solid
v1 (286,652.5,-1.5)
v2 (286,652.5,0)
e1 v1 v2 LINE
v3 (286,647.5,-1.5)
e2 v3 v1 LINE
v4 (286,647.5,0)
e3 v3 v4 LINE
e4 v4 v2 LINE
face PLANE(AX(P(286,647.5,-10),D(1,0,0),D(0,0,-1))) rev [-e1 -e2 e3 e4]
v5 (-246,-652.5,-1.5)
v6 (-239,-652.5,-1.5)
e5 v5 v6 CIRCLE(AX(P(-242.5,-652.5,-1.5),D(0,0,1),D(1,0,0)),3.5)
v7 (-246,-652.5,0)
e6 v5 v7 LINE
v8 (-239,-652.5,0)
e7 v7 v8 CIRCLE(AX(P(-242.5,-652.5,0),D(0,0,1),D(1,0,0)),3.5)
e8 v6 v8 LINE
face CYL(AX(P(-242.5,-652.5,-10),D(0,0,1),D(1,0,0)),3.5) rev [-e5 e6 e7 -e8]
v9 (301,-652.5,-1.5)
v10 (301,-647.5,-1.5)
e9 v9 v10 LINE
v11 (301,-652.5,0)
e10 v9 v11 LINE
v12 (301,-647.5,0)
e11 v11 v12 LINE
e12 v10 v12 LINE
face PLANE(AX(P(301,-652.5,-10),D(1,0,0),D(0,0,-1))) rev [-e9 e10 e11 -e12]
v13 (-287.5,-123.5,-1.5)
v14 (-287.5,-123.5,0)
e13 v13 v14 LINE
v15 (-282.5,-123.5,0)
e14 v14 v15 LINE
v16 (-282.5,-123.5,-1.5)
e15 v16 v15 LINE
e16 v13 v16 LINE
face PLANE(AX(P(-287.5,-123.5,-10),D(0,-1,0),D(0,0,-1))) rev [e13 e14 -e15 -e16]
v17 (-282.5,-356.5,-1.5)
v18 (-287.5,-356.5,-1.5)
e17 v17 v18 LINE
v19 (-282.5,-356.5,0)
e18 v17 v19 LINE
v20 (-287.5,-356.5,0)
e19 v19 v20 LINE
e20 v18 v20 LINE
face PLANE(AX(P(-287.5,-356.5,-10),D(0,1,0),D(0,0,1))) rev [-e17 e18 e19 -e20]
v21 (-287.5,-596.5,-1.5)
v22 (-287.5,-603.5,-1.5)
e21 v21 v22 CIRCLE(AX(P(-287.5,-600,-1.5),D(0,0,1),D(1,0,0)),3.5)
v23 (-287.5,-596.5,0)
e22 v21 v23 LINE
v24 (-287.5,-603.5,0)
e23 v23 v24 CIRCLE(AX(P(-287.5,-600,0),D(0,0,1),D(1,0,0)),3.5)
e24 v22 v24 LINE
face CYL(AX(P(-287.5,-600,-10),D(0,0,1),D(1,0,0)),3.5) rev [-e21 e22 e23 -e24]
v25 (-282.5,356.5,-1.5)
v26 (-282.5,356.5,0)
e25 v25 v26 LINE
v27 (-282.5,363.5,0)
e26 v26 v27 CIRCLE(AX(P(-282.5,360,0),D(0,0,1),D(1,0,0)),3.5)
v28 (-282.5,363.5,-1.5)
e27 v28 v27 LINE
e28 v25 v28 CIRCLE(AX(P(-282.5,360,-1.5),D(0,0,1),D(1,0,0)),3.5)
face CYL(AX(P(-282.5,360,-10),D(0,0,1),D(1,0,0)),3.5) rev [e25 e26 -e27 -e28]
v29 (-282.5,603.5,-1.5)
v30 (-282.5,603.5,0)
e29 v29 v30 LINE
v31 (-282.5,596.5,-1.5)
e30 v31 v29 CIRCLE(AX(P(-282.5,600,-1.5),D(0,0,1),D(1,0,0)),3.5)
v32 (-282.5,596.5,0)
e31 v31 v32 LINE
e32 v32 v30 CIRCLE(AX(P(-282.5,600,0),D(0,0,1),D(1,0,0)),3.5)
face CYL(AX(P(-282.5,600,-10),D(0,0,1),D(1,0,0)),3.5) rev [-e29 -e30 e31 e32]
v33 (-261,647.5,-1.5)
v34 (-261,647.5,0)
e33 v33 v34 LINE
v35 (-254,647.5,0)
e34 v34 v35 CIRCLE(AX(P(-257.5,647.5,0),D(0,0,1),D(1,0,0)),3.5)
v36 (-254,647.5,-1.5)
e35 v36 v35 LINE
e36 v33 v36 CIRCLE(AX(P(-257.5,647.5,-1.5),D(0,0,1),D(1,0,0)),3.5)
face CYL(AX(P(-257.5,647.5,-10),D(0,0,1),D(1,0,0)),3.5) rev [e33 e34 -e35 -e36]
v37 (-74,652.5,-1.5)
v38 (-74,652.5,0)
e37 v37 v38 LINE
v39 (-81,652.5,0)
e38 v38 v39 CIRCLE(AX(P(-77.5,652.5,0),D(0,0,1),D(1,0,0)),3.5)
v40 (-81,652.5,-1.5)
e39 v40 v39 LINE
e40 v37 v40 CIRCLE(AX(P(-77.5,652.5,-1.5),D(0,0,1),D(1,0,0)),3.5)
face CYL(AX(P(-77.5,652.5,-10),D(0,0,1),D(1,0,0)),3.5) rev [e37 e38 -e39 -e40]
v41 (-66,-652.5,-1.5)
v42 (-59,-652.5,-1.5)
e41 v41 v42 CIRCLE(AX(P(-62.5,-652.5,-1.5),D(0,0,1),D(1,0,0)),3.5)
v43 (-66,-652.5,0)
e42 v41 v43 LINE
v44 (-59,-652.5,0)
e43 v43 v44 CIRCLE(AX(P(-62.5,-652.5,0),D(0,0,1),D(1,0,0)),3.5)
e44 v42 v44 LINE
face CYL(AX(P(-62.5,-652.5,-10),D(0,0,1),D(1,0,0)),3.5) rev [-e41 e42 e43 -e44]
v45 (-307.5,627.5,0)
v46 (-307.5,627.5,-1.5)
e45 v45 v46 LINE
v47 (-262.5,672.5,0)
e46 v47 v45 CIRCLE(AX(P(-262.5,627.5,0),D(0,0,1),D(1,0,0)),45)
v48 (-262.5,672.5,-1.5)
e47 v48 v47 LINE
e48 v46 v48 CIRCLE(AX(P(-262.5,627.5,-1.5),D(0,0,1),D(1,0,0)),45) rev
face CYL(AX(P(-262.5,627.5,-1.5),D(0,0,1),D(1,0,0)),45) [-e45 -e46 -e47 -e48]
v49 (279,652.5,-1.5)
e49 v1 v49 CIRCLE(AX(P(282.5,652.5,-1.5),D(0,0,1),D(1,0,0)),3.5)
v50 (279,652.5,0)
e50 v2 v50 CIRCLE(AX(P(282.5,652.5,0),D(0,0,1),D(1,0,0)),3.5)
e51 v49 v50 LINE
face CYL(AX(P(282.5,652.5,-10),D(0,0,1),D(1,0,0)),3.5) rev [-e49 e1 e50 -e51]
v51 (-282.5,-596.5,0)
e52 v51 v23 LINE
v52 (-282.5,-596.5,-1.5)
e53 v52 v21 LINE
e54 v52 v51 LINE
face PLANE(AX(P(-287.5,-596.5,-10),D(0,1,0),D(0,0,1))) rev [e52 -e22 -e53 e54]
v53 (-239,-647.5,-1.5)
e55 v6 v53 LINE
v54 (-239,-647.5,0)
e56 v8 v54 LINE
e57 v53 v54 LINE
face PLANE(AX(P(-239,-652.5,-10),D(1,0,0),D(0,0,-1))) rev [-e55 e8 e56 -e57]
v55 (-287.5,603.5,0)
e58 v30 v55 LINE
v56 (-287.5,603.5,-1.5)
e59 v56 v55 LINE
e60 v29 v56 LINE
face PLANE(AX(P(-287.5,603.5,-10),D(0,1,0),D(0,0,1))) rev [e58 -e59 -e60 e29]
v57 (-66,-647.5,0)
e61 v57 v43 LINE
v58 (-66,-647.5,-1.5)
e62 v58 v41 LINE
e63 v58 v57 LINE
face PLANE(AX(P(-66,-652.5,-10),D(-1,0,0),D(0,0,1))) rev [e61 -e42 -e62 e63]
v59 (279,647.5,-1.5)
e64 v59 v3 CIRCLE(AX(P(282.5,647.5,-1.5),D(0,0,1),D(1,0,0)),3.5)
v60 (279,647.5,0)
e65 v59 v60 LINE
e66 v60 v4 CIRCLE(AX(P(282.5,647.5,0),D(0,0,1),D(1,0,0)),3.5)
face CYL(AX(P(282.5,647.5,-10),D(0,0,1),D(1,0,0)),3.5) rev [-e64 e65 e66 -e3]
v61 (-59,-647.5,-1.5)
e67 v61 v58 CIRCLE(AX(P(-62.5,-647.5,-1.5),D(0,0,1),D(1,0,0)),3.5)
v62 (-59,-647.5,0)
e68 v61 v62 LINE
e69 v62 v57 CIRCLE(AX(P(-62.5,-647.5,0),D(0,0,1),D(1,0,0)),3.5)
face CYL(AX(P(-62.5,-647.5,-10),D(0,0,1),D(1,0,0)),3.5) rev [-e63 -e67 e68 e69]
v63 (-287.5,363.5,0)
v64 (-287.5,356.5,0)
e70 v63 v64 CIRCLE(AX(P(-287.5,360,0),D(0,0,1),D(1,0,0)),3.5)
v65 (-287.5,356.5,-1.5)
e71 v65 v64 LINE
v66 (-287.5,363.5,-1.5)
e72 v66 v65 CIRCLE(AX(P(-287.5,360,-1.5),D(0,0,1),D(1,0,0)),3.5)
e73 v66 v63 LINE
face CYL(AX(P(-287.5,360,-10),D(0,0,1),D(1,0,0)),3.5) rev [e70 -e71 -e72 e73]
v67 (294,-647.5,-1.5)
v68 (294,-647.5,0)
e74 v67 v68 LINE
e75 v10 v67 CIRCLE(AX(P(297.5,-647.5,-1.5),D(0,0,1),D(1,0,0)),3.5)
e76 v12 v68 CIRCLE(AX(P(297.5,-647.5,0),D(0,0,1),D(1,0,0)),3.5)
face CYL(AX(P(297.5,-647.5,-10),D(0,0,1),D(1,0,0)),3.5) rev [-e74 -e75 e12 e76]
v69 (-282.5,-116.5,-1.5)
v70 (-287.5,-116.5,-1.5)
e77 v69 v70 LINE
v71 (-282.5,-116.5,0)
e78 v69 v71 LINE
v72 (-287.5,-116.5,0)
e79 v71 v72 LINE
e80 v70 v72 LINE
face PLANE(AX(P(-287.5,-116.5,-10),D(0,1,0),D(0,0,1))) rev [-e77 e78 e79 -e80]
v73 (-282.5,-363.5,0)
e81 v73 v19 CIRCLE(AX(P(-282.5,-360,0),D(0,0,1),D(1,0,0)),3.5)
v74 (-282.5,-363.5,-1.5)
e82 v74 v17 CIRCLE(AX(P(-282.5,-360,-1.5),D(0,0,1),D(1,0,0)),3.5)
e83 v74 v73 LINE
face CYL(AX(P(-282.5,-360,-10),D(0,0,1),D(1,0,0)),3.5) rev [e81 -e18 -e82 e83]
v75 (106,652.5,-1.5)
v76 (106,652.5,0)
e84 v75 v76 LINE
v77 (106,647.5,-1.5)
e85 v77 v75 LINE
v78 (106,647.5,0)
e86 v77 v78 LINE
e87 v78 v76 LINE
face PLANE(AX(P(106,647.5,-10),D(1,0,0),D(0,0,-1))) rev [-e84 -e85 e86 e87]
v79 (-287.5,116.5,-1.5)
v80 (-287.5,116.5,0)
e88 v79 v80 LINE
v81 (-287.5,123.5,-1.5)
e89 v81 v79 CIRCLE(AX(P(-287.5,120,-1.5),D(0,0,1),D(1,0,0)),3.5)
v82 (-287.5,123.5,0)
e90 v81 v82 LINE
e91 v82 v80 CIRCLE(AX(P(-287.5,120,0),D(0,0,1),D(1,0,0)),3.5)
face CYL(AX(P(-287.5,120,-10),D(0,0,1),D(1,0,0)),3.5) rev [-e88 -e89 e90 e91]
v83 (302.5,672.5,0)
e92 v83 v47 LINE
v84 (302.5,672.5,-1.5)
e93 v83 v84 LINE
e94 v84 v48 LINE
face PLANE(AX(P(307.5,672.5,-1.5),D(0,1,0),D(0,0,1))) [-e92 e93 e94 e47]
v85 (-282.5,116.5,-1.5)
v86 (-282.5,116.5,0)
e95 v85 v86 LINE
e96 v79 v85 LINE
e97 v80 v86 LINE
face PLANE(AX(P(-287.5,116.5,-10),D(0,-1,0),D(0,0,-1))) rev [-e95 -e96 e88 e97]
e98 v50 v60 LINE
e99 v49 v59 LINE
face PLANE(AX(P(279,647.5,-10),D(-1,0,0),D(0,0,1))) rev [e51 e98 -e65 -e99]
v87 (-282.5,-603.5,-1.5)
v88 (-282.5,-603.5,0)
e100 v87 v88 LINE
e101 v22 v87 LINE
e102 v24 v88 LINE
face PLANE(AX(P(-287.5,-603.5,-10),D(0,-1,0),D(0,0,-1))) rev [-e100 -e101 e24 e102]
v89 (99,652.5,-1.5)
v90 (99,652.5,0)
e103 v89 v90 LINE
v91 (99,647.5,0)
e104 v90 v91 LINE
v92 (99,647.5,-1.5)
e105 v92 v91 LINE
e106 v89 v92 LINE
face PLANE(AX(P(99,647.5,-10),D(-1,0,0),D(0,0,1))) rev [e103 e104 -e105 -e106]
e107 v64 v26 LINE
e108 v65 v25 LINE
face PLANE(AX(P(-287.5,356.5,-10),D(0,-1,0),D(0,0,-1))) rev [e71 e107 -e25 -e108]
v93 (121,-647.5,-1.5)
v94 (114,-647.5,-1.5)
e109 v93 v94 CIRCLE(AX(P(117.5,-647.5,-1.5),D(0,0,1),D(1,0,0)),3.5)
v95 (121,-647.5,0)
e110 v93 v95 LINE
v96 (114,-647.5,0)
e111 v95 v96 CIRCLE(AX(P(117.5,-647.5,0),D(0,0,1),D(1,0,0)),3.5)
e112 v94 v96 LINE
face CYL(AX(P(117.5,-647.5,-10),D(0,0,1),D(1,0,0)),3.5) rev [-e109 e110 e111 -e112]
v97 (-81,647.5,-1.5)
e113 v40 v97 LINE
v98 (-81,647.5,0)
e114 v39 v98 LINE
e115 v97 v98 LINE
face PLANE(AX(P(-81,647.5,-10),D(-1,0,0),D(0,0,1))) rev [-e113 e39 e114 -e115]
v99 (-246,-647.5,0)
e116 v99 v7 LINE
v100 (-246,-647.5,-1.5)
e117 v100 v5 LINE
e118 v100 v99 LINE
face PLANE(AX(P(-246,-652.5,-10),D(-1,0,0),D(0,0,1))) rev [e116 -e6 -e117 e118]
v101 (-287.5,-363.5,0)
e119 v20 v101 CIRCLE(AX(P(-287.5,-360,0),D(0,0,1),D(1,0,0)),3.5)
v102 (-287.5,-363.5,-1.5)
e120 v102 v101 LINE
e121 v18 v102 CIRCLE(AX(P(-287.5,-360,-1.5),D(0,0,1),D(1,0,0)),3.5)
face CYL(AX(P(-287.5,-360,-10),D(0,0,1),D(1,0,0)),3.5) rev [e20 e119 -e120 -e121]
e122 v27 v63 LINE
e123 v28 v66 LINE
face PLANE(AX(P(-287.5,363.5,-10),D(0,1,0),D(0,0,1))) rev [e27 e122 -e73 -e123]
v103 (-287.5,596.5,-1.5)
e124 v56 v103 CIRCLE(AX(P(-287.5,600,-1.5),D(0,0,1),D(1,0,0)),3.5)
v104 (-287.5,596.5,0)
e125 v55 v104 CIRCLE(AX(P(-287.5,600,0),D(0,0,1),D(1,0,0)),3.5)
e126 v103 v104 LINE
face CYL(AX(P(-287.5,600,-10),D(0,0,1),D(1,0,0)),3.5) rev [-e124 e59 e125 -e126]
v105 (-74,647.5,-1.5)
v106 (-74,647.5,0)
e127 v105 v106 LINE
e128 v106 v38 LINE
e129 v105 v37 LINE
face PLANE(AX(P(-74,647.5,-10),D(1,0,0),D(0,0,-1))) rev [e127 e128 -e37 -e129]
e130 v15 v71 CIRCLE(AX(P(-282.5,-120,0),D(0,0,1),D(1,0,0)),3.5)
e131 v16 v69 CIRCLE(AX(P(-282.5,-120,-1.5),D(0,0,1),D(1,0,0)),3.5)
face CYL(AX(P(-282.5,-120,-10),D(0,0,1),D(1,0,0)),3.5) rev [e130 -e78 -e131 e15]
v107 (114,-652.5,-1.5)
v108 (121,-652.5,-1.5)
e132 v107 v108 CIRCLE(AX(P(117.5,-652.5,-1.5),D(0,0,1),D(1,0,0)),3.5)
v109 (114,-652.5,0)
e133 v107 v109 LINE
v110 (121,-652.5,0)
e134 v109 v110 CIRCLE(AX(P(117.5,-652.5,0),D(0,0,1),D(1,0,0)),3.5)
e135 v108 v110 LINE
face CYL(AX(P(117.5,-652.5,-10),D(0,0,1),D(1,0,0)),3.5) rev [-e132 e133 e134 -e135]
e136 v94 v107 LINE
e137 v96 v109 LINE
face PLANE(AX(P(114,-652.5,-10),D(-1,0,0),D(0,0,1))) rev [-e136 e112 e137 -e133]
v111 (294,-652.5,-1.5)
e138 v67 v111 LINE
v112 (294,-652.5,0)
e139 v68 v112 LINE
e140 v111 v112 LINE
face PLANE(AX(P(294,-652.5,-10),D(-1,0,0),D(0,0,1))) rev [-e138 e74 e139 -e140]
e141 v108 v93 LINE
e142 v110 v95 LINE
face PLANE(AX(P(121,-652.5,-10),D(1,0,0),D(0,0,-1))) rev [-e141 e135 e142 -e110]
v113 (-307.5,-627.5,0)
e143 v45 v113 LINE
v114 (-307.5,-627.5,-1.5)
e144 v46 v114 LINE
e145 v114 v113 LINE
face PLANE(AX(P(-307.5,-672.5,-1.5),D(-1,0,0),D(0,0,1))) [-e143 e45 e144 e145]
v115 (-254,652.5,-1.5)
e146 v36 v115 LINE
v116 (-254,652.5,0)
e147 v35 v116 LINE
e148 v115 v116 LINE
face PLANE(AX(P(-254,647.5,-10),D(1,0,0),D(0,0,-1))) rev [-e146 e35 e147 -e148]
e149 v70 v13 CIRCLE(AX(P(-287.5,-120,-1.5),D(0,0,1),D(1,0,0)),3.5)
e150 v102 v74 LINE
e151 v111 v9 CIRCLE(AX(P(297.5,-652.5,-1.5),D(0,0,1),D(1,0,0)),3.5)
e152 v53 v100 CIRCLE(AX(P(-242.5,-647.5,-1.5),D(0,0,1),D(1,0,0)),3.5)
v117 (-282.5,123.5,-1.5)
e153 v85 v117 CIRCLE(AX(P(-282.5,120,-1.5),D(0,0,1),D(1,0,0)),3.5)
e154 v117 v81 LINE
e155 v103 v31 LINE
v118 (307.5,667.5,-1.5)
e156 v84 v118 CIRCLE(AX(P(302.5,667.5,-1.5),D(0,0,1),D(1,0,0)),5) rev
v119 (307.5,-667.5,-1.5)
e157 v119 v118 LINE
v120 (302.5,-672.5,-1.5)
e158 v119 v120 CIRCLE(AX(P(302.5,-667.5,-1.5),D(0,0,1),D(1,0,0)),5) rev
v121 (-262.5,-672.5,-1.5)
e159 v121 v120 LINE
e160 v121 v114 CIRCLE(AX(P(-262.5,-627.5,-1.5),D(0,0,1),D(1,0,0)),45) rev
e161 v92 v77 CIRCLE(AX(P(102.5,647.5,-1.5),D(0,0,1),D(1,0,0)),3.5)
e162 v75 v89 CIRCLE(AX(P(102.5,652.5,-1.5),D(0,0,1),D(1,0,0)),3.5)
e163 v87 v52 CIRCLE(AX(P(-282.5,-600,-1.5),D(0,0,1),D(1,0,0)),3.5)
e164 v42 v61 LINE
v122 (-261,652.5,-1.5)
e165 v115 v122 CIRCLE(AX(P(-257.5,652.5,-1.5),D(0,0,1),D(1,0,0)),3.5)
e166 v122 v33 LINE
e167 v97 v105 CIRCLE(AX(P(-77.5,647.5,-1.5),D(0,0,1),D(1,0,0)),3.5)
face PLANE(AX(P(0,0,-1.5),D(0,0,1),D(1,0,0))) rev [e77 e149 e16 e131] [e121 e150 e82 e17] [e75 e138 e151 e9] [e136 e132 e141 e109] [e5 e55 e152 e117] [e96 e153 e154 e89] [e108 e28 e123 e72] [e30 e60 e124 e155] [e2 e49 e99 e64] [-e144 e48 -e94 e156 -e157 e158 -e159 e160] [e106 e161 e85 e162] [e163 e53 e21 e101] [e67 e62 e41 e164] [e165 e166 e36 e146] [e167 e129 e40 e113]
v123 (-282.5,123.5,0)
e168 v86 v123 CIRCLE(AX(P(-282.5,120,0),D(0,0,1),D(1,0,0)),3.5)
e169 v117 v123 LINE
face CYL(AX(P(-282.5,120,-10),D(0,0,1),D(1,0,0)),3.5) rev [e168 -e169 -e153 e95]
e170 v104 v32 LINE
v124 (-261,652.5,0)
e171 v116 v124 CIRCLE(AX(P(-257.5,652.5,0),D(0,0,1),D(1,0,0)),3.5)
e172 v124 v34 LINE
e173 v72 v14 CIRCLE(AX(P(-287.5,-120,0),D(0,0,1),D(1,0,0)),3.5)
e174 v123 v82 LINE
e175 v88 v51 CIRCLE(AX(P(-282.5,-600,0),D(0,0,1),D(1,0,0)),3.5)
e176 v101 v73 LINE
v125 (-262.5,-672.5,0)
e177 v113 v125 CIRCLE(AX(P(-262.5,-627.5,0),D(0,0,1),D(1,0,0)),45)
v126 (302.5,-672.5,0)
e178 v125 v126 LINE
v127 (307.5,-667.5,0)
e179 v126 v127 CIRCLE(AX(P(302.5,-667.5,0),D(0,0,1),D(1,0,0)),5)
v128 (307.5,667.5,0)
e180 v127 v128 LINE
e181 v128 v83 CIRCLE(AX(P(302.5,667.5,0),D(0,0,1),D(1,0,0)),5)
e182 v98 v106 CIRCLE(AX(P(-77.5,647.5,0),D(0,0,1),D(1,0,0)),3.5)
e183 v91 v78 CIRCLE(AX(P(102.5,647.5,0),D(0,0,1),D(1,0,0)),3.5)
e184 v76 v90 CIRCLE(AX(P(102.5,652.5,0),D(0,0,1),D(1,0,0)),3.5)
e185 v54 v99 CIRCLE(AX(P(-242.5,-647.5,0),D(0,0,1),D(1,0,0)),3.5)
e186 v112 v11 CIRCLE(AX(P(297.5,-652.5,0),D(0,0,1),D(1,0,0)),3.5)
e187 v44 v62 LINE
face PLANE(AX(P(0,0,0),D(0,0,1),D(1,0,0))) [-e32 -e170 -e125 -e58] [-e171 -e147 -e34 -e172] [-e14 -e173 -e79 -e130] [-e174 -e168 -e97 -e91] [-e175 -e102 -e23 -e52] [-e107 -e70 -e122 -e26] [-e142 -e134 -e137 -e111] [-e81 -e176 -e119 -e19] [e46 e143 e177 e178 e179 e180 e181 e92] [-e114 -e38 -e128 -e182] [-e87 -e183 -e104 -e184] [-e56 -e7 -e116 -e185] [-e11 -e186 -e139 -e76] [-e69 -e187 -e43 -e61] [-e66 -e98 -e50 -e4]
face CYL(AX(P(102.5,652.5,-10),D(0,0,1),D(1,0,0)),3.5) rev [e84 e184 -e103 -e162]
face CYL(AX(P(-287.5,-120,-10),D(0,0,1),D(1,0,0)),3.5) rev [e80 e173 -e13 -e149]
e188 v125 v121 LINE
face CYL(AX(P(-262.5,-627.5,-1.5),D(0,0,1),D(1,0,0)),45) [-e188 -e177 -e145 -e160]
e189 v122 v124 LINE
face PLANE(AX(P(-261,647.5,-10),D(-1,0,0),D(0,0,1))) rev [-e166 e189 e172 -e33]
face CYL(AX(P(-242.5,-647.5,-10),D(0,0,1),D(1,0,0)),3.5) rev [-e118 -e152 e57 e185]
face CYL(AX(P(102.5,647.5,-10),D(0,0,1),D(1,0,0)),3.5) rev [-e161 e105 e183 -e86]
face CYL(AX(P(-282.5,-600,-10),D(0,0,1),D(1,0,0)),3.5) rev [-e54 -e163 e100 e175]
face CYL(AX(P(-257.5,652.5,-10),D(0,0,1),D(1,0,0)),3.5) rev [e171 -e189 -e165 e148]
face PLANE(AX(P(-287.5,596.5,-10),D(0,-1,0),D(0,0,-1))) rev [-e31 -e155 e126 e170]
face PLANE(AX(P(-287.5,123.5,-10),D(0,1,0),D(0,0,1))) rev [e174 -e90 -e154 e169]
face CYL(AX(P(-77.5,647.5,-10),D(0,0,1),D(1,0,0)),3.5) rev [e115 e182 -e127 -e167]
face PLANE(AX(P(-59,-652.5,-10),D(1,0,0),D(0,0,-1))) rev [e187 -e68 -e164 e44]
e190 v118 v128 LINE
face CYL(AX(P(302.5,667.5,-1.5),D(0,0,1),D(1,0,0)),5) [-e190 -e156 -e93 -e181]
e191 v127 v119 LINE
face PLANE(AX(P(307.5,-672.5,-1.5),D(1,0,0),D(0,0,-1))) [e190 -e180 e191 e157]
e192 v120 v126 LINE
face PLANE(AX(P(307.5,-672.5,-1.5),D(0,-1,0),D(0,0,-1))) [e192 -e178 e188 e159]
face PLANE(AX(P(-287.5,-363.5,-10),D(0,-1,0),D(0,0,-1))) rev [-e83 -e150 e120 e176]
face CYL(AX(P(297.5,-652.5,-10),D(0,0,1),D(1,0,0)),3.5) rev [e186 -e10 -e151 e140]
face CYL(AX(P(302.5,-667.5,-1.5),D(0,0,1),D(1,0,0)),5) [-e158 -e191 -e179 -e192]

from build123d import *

# Parameters (mm, degrees)
SKETCH_1_W             = 615
SKETCH_1_H             = 1345
SM_BASE_FLANGE_1_DEPTH = 1.5
FILLET_1_R             = 45
FILLET_2_R             = 5
CUT_EXTRUDE_2_DEPTH    = 10
PATTERN_LINEAR_1_COUNT = 6
PATTERN_LINEAR_1_PITCH = 240
CUT_EXTRUDE_3_DEPTH    = 10
PATTERN_LINEAR_2_COUNT = 4
PATTERN_LINEAR_2_PITCH = 180


# Sheet-metal steps are written as plain solids
with BuildPart() as part:
    # Sketch 1 → 基体-法兰1 (new body)
    with BuildSketch(Plane.XY):
        Rectangle(SKETCH_1_W, SKETCH_1_H)
    extrude(amount=-SM_BASE_FLANGE_1_DEPTH)

    # 圆角1
    fillet_1_edges = [part.edges().sort_by_distance(p)[0] for p in [
        (-307.5, 672.5, -0.75),
        (-307.5, -672.5, -0.75),
    ]]
    fillet(fillet_1_edges, radius=FILLET_1_R)

    # 圆角2
    fillet_2_edges = [part.edges().sort_by_distance(p)[0] for p in [
        (307.5, 672.5, -0.75),
        (307.5, -672.5, -0.75),
    ]]
    fillet(fillet_2_edges, radius=FILLET_2_R)

    # 草图3 → 切除-拉伸2 (cut)
    with BuildSketch(Plane.XY):
        with BuildLine():
            Line((-287.5, -596.5), (-282.5, -596.5))
            ThreePointArc((-282.5, -596.5), (-279, -600), (-282.5, -603.5))
            Line((-282.5, -603.5), (-287.5, -603.5))
            ThreePointArc((-287.5, -603.5), (-291, -600), (-287.5, -596.5))
        make_face()
    cut_extrude_2 = extrude(amount=-CUT_EXTRUDE_2_DEPTH, mode=Mode.SUBTRACT)

    # 阵列(线性)1: 切除-拉伸2 ×6
    with Locations(*[(0, i * PATTERN_LINEAR_1_PITCH, 0) for i in range(1, PATTERN_LINEAR_1_COUNT)]):
        add(cut_extrude_2, mode=Mode.SUBTRACT)

    # 草图4 → 切除-拉伸3 (cut)
    with BuildSketch(Plane.XY):
        with BuildLine():
            Line((-261, 647.5), (-261, 652.5))
            ThreePointArc((-261, 652.5), (-257.5, 656), (-254, 652.5))
            Line((-254, 652.5), (-254, 647.5))
            ThreePointArc((-254, 647.5), (-257.5, 644), (-261, 647.5))
        make_face()
        with BuildLine():
            Line((-246, -652.5), (-246, -647.5))
            ThreePointArc((-246, -647.5), (-242.5, -644), (-239, -647.5))
            Line((-239, -647.5), (-239, -652.5))
            ThreePointArc((-239, -652.5), (-242.5, -656), (-246, -652.5))
        make_face()
    cut_extrude_3 = extrude(amount=-CUT_EXTRUDE_3_DEPTH, mode=Mode.SUBTRACT)

    # 阵列(线性)2: 切除-拉伸3 ×4
    with Locations(*[(i * PATTERN_LINEAR_2_PITCH, 0, 0) for i in range(1, PATTERN_LINEAR_2_COUNT)]):
        add(cut_extrude_3, mode=Mode.SUBTRACT)


solid = part.part
